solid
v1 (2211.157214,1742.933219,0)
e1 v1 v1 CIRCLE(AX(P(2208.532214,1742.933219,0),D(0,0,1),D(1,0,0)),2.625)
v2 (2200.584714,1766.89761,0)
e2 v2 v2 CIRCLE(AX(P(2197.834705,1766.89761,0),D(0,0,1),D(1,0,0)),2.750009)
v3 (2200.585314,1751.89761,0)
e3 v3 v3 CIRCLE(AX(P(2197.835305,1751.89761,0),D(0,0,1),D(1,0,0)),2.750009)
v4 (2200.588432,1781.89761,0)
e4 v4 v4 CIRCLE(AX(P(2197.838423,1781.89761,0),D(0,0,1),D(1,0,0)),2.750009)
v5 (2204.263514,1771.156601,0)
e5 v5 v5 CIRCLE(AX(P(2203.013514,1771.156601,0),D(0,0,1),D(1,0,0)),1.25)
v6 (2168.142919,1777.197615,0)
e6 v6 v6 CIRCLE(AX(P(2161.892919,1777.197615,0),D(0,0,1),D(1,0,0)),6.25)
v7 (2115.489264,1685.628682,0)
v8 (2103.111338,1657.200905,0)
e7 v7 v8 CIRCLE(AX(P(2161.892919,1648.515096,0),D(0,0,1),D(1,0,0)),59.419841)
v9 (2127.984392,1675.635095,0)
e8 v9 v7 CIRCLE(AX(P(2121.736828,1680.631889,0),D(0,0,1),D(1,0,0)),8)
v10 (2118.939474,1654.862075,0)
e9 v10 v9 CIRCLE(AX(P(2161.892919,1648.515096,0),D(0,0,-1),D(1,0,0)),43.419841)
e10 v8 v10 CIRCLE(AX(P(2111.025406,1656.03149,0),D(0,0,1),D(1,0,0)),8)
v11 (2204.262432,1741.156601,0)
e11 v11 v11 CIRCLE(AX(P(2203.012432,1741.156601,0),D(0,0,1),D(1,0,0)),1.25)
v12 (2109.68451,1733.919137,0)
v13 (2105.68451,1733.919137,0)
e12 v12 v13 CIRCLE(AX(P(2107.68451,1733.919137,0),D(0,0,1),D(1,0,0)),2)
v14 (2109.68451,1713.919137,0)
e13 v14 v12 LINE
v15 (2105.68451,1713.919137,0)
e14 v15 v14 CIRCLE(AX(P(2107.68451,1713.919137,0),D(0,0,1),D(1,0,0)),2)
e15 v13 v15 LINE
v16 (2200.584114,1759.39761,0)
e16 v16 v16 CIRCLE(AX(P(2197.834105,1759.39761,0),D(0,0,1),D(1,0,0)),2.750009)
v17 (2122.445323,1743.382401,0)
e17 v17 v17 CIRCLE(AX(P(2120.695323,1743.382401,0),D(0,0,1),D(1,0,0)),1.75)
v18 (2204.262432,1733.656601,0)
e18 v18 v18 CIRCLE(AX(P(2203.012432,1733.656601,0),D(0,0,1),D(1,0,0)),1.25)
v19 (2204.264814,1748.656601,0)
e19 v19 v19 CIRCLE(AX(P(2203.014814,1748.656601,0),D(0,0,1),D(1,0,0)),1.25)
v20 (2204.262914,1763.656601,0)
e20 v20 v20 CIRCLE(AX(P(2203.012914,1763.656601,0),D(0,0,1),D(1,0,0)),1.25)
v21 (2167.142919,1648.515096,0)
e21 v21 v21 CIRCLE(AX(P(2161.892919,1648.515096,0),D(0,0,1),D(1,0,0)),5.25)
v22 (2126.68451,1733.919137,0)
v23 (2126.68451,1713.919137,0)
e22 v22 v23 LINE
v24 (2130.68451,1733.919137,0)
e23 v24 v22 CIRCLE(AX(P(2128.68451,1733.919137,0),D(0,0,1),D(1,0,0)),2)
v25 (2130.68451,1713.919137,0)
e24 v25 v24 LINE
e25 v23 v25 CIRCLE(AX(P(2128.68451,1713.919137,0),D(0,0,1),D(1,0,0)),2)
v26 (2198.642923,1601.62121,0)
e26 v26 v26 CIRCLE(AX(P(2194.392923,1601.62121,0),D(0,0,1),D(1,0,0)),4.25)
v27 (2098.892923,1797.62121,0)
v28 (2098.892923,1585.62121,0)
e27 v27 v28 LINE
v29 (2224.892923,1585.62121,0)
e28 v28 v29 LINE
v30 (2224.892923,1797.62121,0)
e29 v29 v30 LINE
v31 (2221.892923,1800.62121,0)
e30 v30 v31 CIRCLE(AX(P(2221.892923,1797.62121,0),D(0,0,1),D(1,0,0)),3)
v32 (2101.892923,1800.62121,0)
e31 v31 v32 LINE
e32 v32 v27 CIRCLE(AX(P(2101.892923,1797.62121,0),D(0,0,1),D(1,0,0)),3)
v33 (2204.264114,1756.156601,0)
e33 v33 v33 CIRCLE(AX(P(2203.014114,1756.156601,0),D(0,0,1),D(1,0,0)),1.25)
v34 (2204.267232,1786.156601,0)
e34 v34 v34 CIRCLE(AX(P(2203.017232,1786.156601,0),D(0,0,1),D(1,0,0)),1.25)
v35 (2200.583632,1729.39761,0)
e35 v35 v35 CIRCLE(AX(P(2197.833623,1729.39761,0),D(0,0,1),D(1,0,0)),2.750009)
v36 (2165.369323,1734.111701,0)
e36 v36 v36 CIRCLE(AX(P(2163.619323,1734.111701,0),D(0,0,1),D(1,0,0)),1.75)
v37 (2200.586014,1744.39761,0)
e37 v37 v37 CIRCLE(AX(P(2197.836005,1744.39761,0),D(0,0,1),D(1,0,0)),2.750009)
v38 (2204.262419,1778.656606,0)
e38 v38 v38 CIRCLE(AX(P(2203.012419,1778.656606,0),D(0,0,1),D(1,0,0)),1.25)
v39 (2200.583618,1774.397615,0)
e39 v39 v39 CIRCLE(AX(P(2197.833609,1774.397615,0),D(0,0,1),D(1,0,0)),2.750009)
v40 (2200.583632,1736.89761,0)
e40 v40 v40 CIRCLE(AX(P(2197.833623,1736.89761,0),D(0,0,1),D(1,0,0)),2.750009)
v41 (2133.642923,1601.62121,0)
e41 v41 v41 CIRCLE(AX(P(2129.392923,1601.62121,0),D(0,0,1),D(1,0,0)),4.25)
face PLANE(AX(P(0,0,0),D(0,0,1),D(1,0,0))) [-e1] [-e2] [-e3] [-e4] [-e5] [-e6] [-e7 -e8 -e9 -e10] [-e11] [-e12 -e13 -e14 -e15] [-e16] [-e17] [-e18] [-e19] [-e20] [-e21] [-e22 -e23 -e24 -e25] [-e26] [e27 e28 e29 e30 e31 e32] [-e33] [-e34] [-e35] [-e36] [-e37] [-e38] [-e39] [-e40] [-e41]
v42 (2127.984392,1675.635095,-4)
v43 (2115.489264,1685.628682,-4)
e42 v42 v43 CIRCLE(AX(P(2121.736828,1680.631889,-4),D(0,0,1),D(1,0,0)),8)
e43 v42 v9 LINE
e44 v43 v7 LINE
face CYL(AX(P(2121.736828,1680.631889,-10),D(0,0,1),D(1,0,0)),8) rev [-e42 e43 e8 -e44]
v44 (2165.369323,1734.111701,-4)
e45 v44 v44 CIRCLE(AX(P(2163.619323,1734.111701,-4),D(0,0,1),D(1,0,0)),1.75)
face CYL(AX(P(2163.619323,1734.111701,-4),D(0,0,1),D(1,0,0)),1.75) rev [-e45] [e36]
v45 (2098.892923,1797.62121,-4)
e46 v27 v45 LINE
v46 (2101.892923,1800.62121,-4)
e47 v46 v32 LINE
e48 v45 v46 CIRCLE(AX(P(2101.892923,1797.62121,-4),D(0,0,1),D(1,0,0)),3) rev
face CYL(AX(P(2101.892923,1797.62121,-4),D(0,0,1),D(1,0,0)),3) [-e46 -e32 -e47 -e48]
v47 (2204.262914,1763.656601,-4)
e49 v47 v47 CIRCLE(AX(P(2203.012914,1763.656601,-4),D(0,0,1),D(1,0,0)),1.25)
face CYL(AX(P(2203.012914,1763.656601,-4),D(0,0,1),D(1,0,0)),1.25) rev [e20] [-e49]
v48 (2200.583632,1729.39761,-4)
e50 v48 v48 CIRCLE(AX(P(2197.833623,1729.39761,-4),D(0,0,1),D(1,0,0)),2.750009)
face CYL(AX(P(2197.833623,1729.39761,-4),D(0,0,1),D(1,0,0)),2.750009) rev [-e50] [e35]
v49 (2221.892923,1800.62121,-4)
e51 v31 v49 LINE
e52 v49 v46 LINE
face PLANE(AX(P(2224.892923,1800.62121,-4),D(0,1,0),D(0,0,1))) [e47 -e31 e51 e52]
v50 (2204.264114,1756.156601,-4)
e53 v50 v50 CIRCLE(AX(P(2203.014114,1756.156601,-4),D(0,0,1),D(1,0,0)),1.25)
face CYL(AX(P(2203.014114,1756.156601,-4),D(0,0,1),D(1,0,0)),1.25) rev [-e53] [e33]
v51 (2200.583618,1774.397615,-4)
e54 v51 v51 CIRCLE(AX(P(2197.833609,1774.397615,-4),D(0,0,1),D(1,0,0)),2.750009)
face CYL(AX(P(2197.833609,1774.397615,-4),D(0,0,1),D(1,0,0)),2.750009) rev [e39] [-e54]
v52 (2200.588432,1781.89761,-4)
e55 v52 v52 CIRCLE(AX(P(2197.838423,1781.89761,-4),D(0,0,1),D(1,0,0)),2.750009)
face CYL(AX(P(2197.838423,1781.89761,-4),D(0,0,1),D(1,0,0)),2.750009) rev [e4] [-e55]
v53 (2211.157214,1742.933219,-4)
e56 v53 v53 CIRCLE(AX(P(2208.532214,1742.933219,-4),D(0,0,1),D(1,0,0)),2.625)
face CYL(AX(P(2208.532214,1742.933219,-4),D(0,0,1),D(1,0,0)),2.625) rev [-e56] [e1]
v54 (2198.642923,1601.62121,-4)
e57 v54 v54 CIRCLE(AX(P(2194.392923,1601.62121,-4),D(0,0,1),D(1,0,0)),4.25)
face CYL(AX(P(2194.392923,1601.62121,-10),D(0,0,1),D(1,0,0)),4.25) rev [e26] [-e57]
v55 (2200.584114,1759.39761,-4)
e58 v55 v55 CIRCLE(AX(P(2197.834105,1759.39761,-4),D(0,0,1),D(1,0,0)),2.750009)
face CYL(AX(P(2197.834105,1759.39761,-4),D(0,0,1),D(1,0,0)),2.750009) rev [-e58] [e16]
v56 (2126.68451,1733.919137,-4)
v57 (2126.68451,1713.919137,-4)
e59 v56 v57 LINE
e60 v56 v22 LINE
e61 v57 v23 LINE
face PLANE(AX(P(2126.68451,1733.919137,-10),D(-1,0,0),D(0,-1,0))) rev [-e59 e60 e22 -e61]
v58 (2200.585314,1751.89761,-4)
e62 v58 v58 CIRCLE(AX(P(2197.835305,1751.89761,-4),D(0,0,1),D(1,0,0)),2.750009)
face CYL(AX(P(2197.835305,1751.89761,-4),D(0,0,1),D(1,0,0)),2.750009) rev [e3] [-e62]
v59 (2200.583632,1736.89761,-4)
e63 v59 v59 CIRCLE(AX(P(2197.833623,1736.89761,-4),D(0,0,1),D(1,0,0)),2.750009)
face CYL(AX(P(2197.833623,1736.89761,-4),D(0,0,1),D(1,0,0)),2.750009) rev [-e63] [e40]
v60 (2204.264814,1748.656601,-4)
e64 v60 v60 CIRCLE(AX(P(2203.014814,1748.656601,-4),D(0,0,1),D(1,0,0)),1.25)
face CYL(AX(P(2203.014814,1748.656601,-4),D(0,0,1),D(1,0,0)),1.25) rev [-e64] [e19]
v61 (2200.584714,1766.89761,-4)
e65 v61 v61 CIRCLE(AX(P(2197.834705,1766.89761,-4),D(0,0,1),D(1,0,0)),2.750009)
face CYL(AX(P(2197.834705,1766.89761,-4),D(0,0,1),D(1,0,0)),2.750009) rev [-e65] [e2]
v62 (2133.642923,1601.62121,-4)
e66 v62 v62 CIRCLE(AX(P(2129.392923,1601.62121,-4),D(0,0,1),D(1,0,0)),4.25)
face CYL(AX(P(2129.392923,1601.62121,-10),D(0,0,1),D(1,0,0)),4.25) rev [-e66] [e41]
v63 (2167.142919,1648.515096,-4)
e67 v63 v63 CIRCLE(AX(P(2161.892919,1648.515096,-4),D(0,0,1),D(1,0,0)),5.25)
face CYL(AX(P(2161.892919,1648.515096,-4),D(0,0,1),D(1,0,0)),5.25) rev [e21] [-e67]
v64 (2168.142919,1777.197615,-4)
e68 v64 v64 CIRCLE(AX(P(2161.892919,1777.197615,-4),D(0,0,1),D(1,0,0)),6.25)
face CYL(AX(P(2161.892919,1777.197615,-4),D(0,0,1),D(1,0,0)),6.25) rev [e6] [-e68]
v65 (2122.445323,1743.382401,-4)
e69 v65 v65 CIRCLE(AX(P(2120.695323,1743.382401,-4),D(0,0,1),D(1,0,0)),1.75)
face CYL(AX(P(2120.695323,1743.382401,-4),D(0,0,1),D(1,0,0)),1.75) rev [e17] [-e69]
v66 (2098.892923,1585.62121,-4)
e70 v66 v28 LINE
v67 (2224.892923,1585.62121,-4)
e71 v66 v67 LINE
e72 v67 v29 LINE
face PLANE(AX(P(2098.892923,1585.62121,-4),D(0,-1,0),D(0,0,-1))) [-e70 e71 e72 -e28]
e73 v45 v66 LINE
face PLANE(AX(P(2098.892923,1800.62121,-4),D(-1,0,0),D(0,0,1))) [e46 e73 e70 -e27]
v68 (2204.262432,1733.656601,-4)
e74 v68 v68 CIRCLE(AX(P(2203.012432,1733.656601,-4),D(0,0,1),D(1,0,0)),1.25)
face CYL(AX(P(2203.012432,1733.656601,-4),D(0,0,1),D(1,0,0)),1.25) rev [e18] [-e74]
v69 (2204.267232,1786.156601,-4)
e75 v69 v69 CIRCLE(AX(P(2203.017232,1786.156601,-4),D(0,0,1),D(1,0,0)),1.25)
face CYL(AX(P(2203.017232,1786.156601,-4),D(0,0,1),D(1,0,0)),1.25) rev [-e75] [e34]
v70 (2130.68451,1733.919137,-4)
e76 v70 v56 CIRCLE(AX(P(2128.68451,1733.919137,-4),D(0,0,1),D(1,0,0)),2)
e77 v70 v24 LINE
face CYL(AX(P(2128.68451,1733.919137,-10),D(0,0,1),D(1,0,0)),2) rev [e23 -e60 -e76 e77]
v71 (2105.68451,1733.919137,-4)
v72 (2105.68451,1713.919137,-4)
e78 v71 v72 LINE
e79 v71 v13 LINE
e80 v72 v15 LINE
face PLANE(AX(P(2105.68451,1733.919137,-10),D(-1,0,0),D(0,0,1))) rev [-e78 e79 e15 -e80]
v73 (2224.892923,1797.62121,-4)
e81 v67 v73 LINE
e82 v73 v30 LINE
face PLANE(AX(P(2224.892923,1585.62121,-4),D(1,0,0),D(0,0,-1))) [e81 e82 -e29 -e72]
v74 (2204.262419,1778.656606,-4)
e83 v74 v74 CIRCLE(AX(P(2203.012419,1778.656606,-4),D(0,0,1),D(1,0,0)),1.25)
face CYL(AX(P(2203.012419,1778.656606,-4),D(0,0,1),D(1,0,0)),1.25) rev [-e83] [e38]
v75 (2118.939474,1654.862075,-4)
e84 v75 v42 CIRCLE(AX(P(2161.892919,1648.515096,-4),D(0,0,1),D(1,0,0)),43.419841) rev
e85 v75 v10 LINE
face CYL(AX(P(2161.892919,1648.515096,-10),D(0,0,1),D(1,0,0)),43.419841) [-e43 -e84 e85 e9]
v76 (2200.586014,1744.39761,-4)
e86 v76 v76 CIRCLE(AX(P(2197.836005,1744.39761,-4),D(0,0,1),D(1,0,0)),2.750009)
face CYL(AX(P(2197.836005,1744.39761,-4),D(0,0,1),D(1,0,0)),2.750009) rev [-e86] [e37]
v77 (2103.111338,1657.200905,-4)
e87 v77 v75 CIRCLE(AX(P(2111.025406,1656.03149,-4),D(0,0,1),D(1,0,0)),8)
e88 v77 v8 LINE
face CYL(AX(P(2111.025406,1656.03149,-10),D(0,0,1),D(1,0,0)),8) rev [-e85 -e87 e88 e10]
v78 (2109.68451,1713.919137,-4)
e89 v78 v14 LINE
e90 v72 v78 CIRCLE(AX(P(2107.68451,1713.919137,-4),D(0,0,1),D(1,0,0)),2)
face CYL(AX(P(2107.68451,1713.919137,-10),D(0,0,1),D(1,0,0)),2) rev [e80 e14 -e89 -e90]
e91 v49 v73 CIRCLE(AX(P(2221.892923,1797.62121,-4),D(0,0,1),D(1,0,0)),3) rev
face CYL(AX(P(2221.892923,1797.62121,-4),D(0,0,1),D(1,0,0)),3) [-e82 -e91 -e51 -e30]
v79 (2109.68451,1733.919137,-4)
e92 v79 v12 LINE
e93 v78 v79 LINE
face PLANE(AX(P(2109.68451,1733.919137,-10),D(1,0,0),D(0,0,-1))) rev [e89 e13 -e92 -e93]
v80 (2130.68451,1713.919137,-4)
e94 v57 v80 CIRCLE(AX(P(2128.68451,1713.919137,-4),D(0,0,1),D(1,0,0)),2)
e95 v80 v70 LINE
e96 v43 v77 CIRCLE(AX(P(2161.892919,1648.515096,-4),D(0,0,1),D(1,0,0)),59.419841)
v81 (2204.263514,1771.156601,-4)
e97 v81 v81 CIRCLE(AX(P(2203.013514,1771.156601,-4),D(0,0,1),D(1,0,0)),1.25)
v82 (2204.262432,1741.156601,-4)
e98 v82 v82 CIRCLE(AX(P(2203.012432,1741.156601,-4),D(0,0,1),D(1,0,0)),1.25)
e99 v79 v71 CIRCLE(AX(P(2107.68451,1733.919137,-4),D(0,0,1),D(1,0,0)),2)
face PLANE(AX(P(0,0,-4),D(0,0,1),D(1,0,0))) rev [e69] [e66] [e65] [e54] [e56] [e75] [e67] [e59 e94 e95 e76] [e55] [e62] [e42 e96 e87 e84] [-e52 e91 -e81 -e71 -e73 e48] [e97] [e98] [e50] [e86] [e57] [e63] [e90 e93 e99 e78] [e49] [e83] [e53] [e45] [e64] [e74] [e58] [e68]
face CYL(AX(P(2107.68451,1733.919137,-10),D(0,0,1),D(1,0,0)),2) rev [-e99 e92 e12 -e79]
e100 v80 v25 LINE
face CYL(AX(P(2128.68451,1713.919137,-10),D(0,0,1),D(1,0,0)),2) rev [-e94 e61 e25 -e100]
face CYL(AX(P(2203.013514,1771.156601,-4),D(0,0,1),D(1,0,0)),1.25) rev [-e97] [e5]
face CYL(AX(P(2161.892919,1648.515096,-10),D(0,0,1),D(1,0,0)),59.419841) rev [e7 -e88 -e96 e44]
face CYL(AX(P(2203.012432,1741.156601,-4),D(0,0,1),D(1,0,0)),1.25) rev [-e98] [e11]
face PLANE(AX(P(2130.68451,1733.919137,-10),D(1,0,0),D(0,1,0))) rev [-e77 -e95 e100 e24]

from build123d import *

# Parameters (mm, degrees)
MODEL_W               = 126
MODEL_H               = 215
MODEL_R               = 4.5
MODEL_R_2             = 6.25
MODEL_R_3             = 5.25
MODEL_R_4             = 2.750009003
MODEL_R_5             = 1.25
MODEL_R_6             = 2.625
MODEL_R_7             = 1.75
TABAN_FLAN_1_DEPTH    = 4
IZIM1_W               = 102.176444729
IZIM1_H               = 22.108353538
SEKME1_DEPTH          = 4
IZIM4_R               = 4.25
KES_EKSTR_ZYON1_DEPTH = 10
KES_EKSTR_ZYON2_DEPTH = 10
KES_EKSTR_ZYON4_DEPTH = 10
RADYUS1_R             = 3


# Sheet-metal steps are written as plain solids
with BuildPart() as part:
    # Model → Taban-Flanş1 (new body)
    with BuildSketch(Plane.XY):
        with Locations((2161.892923165, 1693.121210327)):
            Rectangle(MODEL_W, MODEL_H)
        with Locations((2129.437918581, 1602.511715112)):
            Circle(MODEL_R, mode=Mode.SUBTRACT)
        with Locations((2194.437918581, 1602.511715112)):
            Circle(MODEL_R, mode=Mode.SUBTRACT)
        with Locations((2161.892918569, 1777.197615102)):
            Circle(MODEL_R_2, mode=Mode.SUBTRACT)
        with Locations((2161.892918569, 1648.515095807)):
            Circle(MODEL_R_3, mode=Mode.SUBTRACT)
        with Locations((2197.838423148, 1781.897610313)):
            Circle(MODEL_R_4, mode=Mode.SUBTRACT)
        with Locations((2203.017232274, 1786.156601204)):
            Circle(MODEL_R_5, mode=Mode.SUBTRACT)
        with Locations((2197.833609474, 1774.397615119)):
            Circle(MODEL_R_4, mode=Mode.SUBTRACT)
        with Locations((2203.012418599, 1778.65660601)):
            Circle(MODEL_R_5, mode=Mode.SUBTRACT)
        with Locations((2197.834704915, 1766.897610313)):
            Circle(MODEL_R_4, mode=Mode.SUBTRACT)
        with Locations((2203.013514041, 1771.156601204)):
            Circle(MODEL_R_5, mode=Mode.SUBTRACT)
        with Locations((2197.834104915, 1759.397610313)):
            Circle(MODEL_R_4, mode=Mode.SUBTRACT)
        with Locations((2203.012914041, 1763.656601204)):
            Circle(MODEL_R_5, mode=Mode.SUBTRACT)
        with Locations((2197.835304915, 1751.897610313)):
            Circle(MODEL_R_4, mode=Mode.SUBTRACT)
        with Locations((2203.014114041, 1756.156601204)):
            Circle(MODEL_R_5, mode=Mode.SUBTRACT)
        with Locations((2197.836004915, 1744.397610313)):
            Circle(MODEL_R_4, mode=Mode.SUBTRACT)
        with Locations((2203.014814041, 1748.656601204)):
            Circle(MODEL_R_5, mode=Mode.SUBTRACT)
        with Locations((2197.833623148, 1736.897610313)):
            Circle(MODEL_R_4, mode=Mode.SUBTRACT)
        with Locations((2203.012432274, 1741.156601204)):
            Circle(MODEL_R_5, mode=Mode.SUBTRACT)
        with Locations((2197.833623148, 1729.397610313)):
            Circle(MODEL_R_4, mode=Mode.SUBTRACT)
        with Locations((2203.012432274, 1733.656601204)):
            Circle(MODEL_R_5, mode=Mode.SUBTRACT)
        with Locations((2208.53221406, 1742.933219427)):
            Circle(MODEL_R_6, mode=Mode.SUBTRACT)
        with Locations((2163.619323241, 1734.111700763)):
            Circle(MODEL_R_7, mode=Mode.SUBTRACT)
        with Locations((2120.695323241, 1743.382400763)):
            Circle(MODEL_R_7, mode=Mode.SUBTRACT)
    extrude(amount=-TABAN_FLAN_1_DEPTH)

    # Çizim1 → Sekme1 (add)
    with BuildSketch(Plane.XY):
        with Locations((2155.462798754, 1603.699676968)):
            Rectangle(IZIM1_W, IZIM1_H)
    extrude(amount=-SEKME1_DEPTH)

    # Çizim4 → Kes-Ekstrüzyon1 (cut)
    with BuildSketch(Plane.XY):
        with Locations((2129.392923165, 1601.621210327)):
            Circle(IZIM4_R)
        with Locations((2194.392923165, 1601.621210327)):
            Circle(IZIM4_R)
    extrude(amount=-KES_EKSTR_ZYON1_DEPTH, mode=Mode.SUBTRACT)

    # Çizim7 → Kes-Ekstrüzyon2 (cut)
    with BuildSketch(Plane.XY):
        with BuildLine():
            ThreePointArc((2115.489264274, 1685.628682491), (2107.413399384, 1672.236382403), (2103.111338467, 1657.20090545))
            ThreePointArc((2103.111338467, 1657.20090545), (2109.85599076, 1648.117422338), (2118.939473872, 1654.862074631))
            ThreePointArc((2118.939473872, 1654.862074631), (2122.083117431, 1665.848943761), (2127.984391527, 1675.635094799))
            ThreePointArc((2127.984391527, 1675.635094799), (2126.733621746, 1686.879452271), (2115.489264274, 1685.628682491))
        make_face()
    extrude(amount=-KES_EKSTR_ZYON2_DEPTH, mode=Mode.SUBTRACT)

    # Çizim9 → Kes-Ekstrüzyon4 (cut)
    with BuildSketch(Plane.XY):
        with BuildLine():
            Line((2109.684510436, 1733.919137473), (2109.684510436, 1713.919137473))
            ThreePointArc((2109.684510436, 1713.919137473), (2107.684510436, 1711.919137473), (2105.684510436, 1713.919137473))
            Line((2105.684510436, 1713.919137473), (2105.684510436, 1733.919137473))
            ThreePointArc((2105.684510436, 1733.919137473), (2107.684510436, 1735.919137473), (2109.684510436, 1733.919137473))
        make_face()
        with BuildLine():
            Line((2130.684510436, 1733.919137473), (2130.684510436, 1713.919137473))
            ThreePointArc((2130.684510436, 1713.919137473), (2128.684510436, 1711.919137473), (2126.684510436, 1713.919137473))
            Line((2126.684510436, 1713.919137473), (2126.684510436, 1733.919137473))
            ThreePointArc((2126.684510436, 1733.919137473), (2128.684510436, 1735.919137473), (2130.684510436, 1733.919137473))
        make_face()
    extrude(amount=-KES_EKSTR_ZYON4_DEPTH, mode=Mode.SUBTRACT)

    # Radyus1
    radyus1_edges = [part.edges().sort_by_distance(p)[0] for p in [
        (2098.892923165, 1800.621210327, -2),
        (2224.892923165, 1800.621210327, -2),
    ]]
    fillet(radyus1_edges, radius=RADYUS1_R)


solid = part.part
